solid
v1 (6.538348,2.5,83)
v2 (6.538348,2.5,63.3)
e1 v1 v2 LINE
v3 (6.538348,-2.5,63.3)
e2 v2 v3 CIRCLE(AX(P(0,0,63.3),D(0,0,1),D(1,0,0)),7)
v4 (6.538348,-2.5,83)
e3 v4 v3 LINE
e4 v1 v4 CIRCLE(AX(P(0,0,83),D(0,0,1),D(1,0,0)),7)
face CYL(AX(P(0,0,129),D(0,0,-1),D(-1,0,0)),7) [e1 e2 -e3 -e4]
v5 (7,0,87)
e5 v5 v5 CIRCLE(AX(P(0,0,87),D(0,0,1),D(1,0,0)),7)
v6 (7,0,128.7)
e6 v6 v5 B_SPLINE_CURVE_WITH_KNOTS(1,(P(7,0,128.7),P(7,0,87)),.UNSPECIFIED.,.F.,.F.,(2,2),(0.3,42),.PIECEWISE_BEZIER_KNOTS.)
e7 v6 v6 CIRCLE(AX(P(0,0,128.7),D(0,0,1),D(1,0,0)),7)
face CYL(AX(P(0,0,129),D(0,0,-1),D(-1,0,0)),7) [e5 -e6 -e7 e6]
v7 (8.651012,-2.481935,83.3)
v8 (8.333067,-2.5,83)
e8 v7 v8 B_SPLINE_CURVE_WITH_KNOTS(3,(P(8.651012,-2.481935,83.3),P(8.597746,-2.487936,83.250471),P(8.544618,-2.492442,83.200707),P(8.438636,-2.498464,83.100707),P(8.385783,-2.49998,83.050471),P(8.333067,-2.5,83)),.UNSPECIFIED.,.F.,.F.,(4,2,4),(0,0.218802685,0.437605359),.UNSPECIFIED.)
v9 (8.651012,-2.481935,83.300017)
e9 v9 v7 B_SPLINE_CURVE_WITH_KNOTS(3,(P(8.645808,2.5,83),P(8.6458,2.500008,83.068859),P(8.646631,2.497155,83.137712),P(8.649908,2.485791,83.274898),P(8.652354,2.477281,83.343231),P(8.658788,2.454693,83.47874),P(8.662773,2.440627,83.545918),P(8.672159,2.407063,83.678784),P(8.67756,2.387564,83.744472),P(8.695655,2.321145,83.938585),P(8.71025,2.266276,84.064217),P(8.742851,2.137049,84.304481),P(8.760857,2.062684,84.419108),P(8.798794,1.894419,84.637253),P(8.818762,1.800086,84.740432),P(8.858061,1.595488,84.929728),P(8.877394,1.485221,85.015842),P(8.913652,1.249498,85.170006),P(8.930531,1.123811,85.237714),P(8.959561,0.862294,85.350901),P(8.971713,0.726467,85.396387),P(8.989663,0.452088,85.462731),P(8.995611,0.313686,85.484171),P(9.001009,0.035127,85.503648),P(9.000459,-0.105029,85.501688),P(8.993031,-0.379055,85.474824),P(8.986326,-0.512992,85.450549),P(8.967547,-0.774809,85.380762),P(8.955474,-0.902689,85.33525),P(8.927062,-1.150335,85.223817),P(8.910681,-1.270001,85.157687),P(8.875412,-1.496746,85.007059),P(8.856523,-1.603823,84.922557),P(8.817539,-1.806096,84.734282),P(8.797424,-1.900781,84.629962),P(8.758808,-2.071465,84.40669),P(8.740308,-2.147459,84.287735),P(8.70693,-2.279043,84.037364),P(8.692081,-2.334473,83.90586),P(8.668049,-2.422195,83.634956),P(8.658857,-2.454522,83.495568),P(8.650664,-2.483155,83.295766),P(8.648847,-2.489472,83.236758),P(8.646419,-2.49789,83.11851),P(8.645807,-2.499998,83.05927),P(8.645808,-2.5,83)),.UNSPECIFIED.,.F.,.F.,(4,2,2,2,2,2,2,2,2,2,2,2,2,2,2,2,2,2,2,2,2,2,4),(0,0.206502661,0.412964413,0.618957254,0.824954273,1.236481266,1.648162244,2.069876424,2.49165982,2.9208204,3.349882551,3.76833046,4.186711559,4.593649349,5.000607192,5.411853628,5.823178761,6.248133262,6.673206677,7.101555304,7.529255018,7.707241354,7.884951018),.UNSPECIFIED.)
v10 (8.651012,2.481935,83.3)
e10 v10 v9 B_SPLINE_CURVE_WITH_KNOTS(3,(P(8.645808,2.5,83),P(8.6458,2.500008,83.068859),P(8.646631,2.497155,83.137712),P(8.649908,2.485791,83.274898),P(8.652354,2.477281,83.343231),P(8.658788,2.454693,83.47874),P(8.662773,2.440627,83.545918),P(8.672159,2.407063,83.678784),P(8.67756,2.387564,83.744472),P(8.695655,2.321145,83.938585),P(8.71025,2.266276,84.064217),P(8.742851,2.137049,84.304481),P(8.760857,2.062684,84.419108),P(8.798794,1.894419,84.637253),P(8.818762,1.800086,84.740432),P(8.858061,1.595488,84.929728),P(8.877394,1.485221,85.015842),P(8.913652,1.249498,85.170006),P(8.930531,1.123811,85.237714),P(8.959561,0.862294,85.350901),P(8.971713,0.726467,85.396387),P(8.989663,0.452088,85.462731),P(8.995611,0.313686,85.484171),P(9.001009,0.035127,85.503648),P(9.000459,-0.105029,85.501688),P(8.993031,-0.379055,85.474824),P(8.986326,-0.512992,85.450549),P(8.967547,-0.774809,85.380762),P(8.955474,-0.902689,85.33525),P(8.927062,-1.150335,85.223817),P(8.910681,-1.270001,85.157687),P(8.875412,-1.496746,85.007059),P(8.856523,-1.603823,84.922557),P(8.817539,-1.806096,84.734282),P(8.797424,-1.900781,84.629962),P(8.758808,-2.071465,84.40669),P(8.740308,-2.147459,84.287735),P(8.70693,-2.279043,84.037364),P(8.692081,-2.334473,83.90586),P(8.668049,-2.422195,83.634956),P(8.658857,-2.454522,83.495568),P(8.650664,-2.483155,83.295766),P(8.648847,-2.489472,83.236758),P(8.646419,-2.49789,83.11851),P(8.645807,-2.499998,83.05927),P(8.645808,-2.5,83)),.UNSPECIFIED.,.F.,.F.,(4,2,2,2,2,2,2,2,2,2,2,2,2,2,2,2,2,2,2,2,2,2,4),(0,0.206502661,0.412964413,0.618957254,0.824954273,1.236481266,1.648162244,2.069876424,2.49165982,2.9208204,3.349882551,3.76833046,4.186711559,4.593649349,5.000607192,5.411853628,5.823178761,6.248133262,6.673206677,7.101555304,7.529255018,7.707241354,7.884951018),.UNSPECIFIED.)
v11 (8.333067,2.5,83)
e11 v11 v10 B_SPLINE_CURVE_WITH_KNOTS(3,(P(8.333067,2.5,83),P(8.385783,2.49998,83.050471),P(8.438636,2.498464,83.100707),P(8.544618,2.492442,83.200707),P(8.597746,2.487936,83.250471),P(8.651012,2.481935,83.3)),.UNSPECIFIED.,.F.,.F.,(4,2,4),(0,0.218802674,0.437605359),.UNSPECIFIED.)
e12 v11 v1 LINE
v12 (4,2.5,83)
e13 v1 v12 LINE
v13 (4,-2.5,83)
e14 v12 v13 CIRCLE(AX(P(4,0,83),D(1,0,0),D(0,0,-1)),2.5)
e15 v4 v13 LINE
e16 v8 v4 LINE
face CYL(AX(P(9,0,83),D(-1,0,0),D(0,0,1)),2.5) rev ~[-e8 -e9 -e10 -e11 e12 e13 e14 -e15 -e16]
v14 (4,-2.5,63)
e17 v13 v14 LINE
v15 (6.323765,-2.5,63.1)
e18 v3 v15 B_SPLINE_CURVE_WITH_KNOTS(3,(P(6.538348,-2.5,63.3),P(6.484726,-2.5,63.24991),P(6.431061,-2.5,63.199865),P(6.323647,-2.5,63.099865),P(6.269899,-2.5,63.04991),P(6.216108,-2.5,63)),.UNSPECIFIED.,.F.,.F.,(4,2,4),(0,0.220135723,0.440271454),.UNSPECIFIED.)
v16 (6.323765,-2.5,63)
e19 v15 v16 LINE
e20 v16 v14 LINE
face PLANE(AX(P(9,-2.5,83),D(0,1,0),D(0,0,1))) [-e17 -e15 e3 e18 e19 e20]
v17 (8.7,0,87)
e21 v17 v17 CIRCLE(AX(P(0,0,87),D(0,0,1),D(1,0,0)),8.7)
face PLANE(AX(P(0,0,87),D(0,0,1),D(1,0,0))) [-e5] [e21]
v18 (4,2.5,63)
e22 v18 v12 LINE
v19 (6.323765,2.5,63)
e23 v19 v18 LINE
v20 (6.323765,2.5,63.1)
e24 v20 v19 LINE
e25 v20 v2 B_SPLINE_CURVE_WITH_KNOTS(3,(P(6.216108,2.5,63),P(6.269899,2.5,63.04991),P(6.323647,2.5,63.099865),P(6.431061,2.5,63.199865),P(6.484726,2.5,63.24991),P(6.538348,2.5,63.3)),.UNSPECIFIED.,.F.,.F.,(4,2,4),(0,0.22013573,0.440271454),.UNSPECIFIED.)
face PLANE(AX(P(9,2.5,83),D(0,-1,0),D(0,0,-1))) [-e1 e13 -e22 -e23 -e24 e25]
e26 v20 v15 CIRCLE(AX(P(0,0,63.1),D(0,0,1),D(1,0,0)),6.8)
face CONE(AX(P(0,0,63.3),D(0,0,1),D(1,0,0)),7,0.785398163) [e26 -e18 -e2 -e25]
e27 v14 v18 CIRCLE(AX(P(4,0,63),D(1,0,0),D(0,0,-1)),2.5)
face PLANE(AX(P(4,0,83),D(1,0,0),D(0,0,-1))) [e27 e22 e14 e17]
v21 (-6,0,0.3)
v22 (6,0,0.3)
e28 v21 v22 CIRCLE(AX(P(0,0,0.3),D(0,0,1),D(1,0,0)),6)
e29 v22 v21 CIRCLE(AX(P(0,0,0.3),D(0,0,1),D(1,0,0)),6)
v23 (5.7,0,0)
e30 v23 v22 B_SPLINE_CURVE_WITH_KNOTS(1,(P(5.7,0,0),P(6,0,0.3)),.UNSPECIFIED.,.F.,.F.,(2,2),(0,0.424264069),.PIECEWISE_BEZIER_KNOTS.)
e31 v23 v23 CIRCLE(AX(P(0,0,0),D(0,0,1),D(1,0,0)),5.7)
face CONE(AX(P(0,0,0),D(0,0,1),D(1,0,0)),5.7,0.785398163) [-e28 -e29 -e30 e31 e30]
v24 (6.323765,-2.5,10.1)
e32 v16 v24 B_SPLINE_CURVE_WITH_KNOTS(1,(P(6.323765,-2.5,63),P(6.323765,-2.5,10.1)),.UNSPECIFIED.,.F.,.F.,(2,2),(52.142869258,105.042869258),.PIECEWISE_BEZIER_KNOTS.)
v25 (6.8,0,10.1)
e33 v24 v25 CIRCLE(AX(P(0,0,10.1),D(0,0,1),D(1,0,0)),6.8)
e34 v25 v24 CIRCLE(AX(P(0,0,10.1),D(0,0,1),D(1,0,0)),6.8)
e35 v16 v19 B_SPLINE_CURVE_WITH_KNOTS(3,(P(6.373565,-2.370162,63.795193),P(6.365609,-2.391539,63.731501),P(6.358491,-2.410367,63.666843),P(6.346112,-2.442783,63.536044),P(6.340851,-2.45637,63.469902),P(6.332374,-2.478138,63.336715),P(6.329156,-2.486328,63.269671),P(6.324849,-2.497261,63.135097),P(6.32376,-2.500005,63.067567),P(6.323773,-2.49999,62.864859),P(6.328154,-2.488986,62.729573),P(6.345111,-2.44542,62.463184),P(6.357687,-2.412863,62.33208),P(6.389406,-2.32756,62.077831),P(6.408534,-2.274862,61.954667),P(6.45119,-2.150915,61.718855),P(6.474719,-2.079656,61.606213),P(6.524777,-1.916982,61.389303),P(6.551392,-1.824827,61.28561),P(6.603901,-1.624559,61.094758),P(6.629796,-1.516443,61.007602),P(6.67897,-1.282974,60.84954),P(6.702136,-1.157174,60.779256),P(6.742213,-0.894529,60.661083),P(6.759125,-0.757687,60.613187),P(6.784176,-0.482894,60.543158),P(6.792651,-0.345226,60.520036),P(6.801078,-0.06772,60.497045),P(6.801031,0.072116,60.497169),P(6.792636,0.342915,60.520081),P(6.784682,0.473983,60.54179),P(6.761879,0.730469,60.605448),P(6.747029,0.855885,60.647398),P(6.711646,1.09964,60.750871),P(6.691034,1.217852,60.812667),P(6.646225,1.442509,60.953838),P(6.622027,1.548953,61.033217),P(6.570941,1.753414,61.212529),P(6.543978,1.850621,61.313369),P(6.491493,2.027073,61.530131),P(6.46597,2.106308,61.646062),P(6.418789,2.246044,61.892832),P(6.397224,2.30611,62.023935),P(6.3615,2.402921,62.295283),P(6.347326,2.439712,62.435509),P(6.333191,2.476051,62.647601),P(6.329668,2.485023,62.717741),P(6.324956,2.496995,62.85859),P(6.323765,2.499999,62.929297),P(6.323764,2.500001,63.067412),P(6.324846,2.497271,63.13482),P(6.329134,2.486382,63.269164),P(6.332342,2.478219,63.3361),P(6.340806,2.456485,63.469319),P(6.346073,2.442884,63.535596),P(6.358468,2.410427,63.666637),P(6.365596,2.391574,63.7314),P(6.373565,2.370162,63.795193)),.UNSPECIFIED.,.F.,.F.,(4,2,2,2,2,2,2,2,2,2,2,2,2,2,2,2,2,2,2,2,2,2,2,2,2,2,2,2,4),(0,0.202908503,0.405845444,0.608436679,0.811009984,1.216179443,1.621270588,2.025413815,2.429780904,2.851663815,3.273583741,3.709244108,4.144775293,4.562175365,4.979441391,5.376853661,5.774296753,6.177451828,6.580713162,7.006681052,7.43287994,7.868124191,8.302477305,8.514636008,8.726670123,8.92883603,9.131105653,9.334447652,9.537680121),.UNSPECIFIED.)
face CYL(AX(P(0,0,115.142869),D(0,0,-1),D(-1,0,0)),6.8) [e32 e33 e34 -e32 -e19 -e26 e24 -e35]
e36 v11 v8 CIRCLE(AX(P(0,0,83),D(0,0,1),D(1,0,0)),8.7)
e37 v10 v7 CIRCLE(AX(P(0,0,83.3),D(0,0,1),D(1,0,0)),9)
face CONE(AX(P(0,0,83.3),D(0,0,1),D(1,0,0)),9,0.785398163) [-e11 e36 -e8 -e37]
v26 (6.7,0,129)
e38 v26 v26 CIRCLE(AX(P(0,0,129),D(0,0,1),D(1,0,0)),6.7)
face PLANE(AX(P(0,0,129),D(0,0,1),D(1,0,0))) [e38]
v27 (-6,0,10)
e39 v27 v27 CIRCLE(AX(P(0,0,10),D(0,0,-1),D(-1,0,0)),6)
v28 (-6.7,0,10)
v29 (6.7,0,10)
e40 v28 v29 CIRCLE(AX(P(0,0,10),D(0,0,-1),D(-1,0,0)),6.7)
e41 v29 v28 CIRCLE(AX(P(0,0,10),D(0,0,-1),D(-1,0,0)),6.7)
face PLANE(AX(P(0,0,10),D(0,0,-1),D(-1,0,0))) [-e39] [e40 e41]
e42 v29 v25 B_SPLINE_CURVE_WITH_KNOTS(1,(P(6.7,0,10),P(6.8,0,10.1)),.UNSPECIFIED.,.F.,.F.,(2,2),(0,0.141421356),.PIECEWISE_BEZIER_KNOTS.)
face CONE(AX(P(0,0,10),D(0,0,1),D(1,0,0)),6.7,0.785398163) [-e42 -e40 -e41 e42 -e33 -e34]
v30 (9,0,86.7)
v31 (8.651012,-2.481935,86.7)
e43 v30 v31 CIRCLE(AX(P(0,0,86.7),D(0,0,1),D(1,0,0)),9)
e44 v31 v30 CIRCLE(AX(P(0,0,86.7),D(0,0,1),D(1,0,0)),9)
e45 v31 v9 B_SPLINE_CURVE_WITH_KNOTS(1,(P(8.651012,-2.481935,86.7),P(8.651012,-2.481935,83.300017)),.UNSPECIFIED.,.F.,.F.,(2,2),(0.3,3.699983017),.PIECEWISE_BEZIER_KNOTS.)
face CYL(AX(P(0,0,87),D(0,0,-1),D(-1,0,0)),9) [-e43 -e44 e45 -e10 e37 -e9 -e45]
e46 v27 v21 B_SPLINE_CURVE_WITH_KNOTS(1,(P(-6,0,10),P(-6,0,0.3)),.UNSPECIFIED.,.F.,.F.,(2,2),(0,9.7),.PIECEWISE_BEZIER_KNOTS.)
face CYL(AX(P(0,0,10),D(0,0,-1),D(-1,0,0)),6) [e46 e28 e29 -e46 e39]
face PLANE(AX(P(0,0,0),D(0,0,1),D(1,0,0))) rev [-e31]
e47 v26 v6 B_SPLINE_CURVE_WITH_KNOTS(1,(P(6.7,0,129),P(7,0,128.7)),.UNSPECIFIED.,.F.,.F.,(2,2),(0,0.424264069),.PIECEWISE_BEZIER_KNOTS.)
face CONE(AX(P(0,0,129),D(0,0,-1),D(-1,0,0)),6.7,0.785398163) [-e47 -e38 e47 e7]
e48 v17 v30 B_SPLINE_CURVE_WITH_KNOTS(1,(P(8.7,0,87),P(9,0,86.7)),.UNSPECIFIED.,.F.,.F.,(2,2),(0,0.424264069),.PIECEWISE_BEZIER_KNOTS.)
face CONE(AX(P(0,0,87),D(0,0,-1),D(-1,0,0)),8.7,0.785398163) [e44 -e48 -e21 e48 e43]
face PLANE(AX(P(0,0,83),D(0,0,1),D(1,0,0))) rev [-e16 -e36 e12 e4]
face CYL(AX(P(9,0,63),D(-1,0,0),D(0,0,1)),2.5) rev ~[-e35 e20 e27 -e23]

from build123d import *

# Parameters (mm, degrees)
SKETCH1_R         = 7
EXTRUDE1_DEPTH    = 129
EXTRUDE2_START    = -46
SKETCH2_R         = 9
EXTRUDE2_DEPTH    = 4
EXTRUDE3_START    = 4
EXTRUDE3_DEPTH    = 126.626386203
SKETCH4_OUTSIDE_W = 46.298
SKETCH4_OUTSIDE_H = 46.298
SKETCH4_OUTSIDE_R = 6
EXTRUDE4_DEPTH    = 10
CHAMFER1_SIZE     = 0.3
SKETCH5_OUTSIDE_W = 46.298
SKETCH5_OUTSIDE_H = 46.298
SKETCH5_OUTSIDE_R = 6.8
EXTRUDE5_DEPTH    = 63
CHAMFER2_SIZE     = 0.3


with BuildPart() as part:
    # Sketch1 → Extrude1 (new body)
    with BuildSketch(Plane.XY):
        Circle(SKETCH1_R)
    extrude(amount=EXTRUDE1_DEPTH)

    # Sketch2 → Extrude2 (add)
    with BuildSketch(Plane.XY.offset(129).offset(EXTRUDE2_START)):
        Circle(SKETCH2_R)
    extrude(amount=EXTRUDE2_DEPTH)

    # Sketch3 → Extrude3 (cut, through all)
    with BuildSketch(Plane(origin=(0, 0, 0), x_dir=(0, 0, -1), z_dir=(1, 0, 0)).offset(EXTRUDE3_START)):
        with BuildLine():
            Line((-83, 2.5), (-63, 2.5))
            ThreePointArc((-63, 2.5), (-60.5, 0), (-63, -2.5))
            Line((-63, -2.5), (-83, -2.5))
            ThreePointArc((-83, -2.5), (-85.5, 0), (-83, 2.5))
        make_face()
    extrude(amount=EXTRUDE3_DEPTH, mode=Mode.SUBTRACT)

    # Sketch4 outside → Extrude4 (cut)
    with BuildSketch(Plane(origin=(0, 0, 0), x_dir=(-1, 0, 0), z_dir=(0, 0, -1))):
        Rectangle(SKETCH4_OUTSIDE_W, SKETCH4_OUTSIDE_H)
        Circle(SKETCH4_OUTSIDE_R, mode=Mode.SUBTRACT)
    extrude(amount=-EXTRUDE4_DEPTH, mode=Mode.SUBTRACT)

    # Chamfer1
    chamfer1_edges = [part.edges().sort_by_distance(p)[0] for p in [
        (6, 0, 0),
        (-7, 0, 129),
        (-9, 0, 87),
        (-9, 0, 83),
        (-7, 0, 10),
    ]]
    chamfer(chamfer1_edges, length=CHAMFER1_SIZE)

    # Sketch5 outside → Extrude5 (cut)
    with BuildSketch(Plane(origin=(0, 0, 0), x_dir=(-1, 0, 0), z_dir=(0, 0, -1))):
        Rectangle(SKETCH5_OUTSIDE_W, SKETCH5_OUTSIDE_H)
        with Locations(Location((0, 0, 0), (0, 0, 158.429421698))):
            Circle(SKETCH5_OUTSIDE_R, mode=Mode.SUBTRACT)
    extrude(amount=-EXTRUDE5_DEPTH, mode=Mode.SUBTRACT)

    # Chamfer2
    # the kernel refuses this chamfer: 0.3 mm, written as the material it takes off along each edge
    with BuildSketch(Plane(origin=(0, 0, 63), x_dir=(0.9678051111401075, -0.25170074861049596, 0), z_dir=(0.25170074861049596, 0.9678051111401075, 0))) as chamfer2_piece_1_section:
        Polygon((7, -CHAMFER2_SIZE), (7 - CHAMFER2_SIZE, 0), (7, 0), align=None)
    chamfer2_piece_1 = revolve(axis=Axis((0, 0, 63), (0, 0, -1)), revolution_arc=330.843646851, mode=Mode.PRIVATE)
    chamfer2_piece_1 = chamfer2_piece_1 - Plane(origin=(0, 0, 63.195747315), x_dir=(0.9299653972776295, 0.36764705882987936, 0), z_dir=(0, 0, -1)) * Cylinder(6.8, 28, mode=Mode.PRIVATE)
    add(chamfer2_piece_1, mode=Mode.SUBTRACT)


solid = part.part
